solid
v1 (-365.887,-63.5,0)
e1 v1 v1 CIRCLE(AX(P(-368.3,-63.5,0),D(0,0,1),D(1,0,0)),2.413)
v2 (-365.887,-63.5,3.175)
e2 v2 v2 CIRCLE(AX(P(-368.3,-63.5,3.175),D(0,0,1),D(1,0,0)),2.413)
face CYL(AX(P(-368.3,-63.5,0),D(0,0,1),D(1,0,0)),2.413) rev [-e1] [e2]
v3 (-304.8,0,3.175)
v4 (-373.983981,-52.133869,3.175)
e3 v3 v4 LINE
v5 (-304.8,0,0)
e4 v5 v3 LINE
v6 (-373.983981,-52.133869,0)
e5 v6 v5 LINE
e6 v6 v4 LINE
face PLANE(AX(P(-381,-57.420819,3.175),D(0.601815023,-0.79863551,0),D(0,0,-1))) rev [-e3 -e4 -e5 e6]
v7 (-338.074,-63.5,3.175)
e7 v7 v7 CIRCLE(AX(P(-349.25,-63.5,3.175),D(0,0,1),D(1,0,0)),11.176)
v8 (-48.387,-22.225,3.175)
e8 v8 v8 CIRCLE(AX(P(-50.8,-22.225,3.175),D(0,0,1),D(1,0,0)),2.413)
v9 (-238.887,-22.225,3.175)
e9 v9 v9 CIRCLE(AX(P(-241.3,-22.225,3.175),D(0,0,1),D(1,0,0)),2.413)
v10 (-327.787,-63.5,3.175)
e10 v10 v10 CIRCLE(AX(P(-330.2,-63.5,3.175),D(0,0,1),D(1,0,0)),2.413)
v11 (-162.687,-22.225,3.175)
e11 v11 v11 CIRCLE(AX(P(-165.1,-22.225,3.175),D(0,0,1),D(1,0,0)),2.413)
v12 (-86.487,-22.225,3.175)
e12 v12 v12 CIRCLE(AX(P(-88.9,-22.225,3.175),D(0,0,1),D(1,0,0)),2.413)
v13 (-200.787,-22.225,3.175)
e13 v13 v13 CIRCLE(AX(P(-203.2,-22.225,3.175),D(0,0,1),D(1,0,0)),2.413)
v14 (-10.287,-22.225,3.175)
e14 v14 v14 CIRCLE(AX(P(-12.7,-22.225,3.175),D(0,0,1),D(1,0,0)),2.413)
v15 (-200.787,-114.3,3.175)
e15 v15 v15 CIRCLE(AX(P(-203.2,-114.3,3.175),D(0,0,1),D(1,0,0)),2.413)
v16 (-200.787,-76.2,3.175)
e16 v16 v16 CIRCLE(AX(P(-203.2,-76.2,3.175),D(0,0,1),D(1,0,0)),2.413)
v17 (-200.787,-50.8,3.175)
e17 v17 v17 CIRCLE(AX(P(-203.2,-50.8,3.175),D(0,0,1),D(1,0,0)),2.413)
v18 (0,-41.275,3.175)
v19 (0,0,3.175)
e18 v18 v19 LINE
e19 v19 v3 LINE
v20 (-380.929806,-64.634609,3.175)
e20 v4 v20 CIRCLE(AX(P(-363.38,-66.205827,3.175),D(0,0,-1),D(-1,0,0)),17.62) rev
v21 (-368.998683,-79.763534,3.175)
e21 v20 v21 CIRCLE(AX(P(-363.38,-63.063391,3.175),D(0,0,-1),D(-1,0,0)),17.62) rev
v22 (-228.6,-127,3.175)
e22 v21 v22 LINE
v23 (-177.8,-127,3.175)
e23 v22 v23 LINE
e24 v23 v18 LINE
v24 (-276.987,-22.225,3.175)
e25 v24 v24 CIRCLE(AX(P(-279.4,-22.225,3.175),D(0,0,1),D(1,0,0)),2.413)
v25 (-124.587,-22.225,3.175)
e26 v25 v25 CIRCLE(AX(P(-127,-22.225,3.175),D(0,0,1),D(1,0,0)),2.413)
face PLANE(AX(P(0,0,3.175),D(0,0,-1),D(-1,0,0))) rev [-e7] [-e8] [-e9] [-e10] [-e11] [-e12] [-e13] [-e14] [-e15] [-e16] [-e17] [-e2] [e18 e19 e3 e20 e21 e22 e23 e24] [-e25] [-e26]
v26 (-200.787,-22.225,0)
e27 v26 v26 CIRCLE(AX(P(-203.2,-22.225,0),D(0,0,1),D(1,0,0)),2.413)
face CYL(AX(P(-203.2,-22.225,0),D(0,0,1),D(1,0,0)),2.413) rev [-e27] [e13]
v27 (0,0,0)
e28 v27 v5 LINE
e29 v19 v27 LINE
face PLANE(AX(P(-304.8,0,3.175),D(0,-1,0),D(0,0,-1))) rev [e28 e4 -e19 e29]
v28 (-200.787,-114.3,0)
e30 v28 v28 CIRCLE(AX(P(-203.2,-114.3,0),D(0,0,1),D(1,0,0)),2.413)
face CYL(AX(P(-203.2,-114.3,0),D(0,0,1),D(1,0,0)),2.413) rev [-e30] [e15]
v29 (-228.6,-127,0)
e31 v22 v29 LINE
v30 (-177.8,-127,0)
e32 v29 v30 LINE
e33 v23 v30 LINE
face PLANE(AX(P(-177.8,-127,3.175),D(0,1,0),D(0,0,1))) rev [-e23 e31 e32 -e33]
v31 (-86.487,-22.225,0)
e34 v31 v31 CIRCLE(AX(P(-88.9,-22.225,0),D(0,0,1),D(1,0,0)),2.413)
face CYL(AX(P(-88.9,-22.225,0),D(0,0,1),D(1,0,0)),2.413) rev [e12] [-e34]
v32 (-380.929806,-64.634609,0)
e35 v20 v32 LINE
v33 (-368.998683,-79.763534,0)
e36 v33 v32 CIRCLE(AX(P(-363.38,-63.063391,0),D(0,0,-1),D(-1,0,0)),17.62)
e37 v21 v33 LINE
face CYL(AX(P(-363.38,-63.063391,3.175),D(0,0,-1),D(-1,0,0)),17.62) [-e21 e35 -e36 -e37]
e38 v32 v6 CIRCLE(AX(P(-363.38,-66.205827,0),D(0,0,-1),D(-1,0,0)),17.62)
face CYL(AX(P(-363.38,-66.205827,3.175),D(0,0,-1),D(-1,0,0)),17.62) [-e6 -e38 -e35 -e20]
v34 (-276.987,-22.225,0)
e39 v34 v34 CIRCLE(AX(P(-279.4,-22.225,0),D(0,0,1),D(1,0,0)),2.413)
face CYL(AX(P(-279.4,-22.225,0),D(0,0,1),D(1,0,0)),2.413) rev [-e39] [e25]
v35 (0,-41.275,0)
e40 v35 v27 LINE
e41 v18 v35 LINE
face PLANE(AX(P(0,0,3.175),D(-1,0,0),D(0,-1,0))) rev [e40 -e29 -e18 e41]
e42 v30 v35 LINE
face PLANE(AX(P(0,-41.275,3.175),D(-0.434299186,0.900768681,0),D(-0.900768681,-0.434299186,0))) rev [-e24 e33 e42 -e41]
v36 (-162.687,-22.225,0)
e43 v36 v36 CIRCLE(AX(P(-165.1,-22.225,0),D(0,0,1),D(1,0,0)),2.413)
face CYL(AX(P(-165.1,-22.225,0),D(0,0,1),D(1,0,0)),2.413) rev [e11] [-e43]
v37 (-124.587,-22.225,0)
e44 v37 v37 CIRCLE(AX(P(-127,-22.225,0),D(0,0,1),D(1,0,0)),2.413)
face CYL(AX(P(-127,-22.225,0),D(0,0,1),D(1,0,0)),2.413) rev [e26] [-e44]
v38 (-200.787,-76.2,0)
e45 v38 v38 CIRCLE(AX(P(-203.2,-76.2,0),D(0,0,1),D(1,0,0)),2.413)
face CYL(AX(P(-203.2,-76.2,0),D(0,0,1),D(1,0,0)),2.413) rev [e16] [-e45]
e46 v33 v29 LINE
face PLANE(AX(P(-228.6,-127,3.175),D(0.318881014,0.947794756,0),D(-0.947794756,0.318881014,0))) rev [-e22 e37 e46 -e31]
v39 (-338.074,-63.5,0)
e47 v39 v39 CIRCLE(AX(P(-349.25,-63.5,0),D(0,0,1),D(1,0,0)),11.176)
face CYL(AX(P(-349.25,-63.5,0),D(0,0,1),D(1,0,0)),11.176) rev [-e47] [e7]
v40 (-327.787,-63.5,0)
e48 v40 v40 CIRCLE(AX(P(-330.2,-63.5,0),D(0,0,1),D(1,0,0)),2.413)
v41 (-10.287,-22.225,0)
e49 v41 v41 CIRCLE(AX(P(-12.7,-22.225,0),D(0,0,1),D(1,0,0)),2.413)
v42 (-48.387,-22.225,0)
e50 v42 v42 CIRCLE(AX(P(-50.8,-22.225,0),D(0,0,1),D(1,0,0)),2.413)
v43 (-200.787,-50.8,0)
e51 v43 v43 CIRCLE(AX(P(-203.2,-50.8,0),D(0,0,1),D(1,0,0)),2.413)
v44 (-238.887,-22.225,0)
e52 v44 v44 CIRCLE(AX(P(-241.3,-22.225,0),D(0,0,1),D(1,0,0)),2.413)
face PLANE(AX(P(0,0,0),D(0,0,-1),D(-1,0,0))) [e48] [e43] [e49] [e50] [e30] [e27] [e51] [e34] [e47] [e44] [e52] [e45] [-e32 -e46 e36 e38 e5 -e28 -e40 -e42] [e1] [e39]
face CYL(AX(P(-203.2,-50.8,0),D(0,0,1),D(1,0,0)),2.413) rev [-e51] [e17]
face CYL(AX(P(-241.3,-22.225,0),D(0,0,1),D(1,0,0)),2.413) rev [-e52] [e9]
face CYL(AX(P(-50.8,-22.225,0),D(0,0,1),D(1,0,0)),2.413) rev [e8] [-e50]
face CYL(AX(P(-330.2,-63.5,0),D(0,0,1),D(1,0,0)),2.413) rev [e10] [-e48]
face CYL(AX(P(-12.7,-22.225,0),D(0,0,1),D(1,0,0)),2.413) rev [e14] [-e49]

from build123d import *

# Parameters (mm, degrees)
BOSS_EXTRUDE1_DEPTH = 3.175
SKETCH2_R           = 11.176
SKETCH2_R_2         = 2.413
CUT_EXTRUDE1_DEPTH  = 3.175
CHAMFER2_SIZE       = 76.2
CHAMFER2_SIZE2      = 57.420818618
FILLET2_R           = 17.62
SKETCH3_R           = 2.413
CUT_EXTRUDE2_DEPTH  = 3.175


with BuildPart() as part:
    # Sketch1 → Boss-Extrude1 (new body)
    with BuildSketch(Plane.XY):
        Polygon((-304.8, 0), (0, 0), (0, -41.275), (-177.8, -127), (-228.6, -127), (-381, -75.7257486), (-381, 0), align=None)
    extrude(amount=BOSS_EXTRUDE1_DEPTH)

    # Sketch2 → Cut-Extrude1 (cut)
    with BuildSketch(Plane.XY.offset(3.175)):
        with Locations((-349.25, -63.5)):
            Circle(SKETCH2_R)
        with Locations((-279.4, -22.225)):
            Circle(SKETCH2_R_2)
        with Locations((-241.3, -22.225)):
            Circle(SKETCH2_R_2)
        with Locations((-203.2, -22.225)):
            Circle(SKETCH2_R_2)
        with Locations((-203.2, -50.8)):
            Circle(SKETCH2_R_2)
        with Locations((-165.1, -22.225)):
            Circle(SKETCH2_R_2)
        with Locations((-127, -22.225)):
            Circle(SKETCH2_R_2)
        with Locations((-88.9, -22.225)):
            Circle(SKETCH2_R_2)
        with Locations((-12.7, -22.225)):
            Circle(SKETCH2_R_2)
        with Locations((-203.2, -76.2)):
            Circle(SKETCH2_R_2)
        with Locations((-203.2, -114.3)):
            Circle(SKETCH2_R_2)
        with Locations((-50.8, -22.225)):
            Circle(SKETCH2_R_2)
    extrude(amount=-CUT_EXTRUDE1_DEPTH, mode=Mode.SUBTRACT)

    # Chamfer2
    chamfer2_edges = [part.edges().sort_by_distance(p)[0] for p in [
        (-381, 0, 1.5875),
    ]]
    chamfer2_side = [part.faces().sort_by_distance(p)[0] for p in [
        (-190.5, 0, 1.5875),
    ]]
    chamfer(chamfer2_edges, length=CHAMFER2_SIZE, length2=CHAMFER2_SIZE2, reference=chamfer2_side[0])

    # Fillet2
    # the kernel refuses this fillet: 17.62 mm, written as the material it takes off along each edge
    with BuildSketch(Plane(origin=(-381, -75.7257486, -31.65589506), x_dir=(0, 1, 0), z_dir=(0, 0, 1))) as fillet2_piece_1:
        with BuildLine():
            CenterArc((FILLET2_R * 0.718635529169, -FILLET2_R), FILLET2_R, 90, 71.404733131)
            Line((-FILLET2_R * 0.22915922643, -FILLET2_R * 0.681118985733), (0, 0))
            Line((0, 0), (FILLET2_R * 0.718635529169, 0))
        make_face()
    extrude(amount=66.48679012, mode=Mode.SUBTRACT)
    with BuildSketch(Plane(origin=(-381, -57.420818618, -21.962519835), x_dir=(0.7986355100472917, 0.6018150231520498, 0), z_dir=(0, 0, 1))) as fillet2_piece_2:
        with BuildLine():
            CenterArc((FILLET2_R * 0.498581608053, -FILLET2_R), FILLET2_R, 90, 53)
            Line((-FILLET2_R * 0.300053901994, -FILLET2_R * 0.398184976848), (0, 0))
            Line((0, 0), (FILLET2_R * 0.498581608053, 0))
        make_face()
    extrude(amount=47.10003967, mode=Mode.SUBTRACT)

    # Sketch3 → Cut-Extrude2 (cut)
    with BuildSketch(Plane.XY.offset(3.175)):
        with Locations((-368.3, -63.5)):
            Circle(SKETCH3_R)
        with Locations((-330.2, -63.5)):
            Circle(SKETCH3_R)
    extrude(amount=-CUT_EXTRUDE2_DEPTH, mode=Mode.SUBTRACT)


solid = part.part
